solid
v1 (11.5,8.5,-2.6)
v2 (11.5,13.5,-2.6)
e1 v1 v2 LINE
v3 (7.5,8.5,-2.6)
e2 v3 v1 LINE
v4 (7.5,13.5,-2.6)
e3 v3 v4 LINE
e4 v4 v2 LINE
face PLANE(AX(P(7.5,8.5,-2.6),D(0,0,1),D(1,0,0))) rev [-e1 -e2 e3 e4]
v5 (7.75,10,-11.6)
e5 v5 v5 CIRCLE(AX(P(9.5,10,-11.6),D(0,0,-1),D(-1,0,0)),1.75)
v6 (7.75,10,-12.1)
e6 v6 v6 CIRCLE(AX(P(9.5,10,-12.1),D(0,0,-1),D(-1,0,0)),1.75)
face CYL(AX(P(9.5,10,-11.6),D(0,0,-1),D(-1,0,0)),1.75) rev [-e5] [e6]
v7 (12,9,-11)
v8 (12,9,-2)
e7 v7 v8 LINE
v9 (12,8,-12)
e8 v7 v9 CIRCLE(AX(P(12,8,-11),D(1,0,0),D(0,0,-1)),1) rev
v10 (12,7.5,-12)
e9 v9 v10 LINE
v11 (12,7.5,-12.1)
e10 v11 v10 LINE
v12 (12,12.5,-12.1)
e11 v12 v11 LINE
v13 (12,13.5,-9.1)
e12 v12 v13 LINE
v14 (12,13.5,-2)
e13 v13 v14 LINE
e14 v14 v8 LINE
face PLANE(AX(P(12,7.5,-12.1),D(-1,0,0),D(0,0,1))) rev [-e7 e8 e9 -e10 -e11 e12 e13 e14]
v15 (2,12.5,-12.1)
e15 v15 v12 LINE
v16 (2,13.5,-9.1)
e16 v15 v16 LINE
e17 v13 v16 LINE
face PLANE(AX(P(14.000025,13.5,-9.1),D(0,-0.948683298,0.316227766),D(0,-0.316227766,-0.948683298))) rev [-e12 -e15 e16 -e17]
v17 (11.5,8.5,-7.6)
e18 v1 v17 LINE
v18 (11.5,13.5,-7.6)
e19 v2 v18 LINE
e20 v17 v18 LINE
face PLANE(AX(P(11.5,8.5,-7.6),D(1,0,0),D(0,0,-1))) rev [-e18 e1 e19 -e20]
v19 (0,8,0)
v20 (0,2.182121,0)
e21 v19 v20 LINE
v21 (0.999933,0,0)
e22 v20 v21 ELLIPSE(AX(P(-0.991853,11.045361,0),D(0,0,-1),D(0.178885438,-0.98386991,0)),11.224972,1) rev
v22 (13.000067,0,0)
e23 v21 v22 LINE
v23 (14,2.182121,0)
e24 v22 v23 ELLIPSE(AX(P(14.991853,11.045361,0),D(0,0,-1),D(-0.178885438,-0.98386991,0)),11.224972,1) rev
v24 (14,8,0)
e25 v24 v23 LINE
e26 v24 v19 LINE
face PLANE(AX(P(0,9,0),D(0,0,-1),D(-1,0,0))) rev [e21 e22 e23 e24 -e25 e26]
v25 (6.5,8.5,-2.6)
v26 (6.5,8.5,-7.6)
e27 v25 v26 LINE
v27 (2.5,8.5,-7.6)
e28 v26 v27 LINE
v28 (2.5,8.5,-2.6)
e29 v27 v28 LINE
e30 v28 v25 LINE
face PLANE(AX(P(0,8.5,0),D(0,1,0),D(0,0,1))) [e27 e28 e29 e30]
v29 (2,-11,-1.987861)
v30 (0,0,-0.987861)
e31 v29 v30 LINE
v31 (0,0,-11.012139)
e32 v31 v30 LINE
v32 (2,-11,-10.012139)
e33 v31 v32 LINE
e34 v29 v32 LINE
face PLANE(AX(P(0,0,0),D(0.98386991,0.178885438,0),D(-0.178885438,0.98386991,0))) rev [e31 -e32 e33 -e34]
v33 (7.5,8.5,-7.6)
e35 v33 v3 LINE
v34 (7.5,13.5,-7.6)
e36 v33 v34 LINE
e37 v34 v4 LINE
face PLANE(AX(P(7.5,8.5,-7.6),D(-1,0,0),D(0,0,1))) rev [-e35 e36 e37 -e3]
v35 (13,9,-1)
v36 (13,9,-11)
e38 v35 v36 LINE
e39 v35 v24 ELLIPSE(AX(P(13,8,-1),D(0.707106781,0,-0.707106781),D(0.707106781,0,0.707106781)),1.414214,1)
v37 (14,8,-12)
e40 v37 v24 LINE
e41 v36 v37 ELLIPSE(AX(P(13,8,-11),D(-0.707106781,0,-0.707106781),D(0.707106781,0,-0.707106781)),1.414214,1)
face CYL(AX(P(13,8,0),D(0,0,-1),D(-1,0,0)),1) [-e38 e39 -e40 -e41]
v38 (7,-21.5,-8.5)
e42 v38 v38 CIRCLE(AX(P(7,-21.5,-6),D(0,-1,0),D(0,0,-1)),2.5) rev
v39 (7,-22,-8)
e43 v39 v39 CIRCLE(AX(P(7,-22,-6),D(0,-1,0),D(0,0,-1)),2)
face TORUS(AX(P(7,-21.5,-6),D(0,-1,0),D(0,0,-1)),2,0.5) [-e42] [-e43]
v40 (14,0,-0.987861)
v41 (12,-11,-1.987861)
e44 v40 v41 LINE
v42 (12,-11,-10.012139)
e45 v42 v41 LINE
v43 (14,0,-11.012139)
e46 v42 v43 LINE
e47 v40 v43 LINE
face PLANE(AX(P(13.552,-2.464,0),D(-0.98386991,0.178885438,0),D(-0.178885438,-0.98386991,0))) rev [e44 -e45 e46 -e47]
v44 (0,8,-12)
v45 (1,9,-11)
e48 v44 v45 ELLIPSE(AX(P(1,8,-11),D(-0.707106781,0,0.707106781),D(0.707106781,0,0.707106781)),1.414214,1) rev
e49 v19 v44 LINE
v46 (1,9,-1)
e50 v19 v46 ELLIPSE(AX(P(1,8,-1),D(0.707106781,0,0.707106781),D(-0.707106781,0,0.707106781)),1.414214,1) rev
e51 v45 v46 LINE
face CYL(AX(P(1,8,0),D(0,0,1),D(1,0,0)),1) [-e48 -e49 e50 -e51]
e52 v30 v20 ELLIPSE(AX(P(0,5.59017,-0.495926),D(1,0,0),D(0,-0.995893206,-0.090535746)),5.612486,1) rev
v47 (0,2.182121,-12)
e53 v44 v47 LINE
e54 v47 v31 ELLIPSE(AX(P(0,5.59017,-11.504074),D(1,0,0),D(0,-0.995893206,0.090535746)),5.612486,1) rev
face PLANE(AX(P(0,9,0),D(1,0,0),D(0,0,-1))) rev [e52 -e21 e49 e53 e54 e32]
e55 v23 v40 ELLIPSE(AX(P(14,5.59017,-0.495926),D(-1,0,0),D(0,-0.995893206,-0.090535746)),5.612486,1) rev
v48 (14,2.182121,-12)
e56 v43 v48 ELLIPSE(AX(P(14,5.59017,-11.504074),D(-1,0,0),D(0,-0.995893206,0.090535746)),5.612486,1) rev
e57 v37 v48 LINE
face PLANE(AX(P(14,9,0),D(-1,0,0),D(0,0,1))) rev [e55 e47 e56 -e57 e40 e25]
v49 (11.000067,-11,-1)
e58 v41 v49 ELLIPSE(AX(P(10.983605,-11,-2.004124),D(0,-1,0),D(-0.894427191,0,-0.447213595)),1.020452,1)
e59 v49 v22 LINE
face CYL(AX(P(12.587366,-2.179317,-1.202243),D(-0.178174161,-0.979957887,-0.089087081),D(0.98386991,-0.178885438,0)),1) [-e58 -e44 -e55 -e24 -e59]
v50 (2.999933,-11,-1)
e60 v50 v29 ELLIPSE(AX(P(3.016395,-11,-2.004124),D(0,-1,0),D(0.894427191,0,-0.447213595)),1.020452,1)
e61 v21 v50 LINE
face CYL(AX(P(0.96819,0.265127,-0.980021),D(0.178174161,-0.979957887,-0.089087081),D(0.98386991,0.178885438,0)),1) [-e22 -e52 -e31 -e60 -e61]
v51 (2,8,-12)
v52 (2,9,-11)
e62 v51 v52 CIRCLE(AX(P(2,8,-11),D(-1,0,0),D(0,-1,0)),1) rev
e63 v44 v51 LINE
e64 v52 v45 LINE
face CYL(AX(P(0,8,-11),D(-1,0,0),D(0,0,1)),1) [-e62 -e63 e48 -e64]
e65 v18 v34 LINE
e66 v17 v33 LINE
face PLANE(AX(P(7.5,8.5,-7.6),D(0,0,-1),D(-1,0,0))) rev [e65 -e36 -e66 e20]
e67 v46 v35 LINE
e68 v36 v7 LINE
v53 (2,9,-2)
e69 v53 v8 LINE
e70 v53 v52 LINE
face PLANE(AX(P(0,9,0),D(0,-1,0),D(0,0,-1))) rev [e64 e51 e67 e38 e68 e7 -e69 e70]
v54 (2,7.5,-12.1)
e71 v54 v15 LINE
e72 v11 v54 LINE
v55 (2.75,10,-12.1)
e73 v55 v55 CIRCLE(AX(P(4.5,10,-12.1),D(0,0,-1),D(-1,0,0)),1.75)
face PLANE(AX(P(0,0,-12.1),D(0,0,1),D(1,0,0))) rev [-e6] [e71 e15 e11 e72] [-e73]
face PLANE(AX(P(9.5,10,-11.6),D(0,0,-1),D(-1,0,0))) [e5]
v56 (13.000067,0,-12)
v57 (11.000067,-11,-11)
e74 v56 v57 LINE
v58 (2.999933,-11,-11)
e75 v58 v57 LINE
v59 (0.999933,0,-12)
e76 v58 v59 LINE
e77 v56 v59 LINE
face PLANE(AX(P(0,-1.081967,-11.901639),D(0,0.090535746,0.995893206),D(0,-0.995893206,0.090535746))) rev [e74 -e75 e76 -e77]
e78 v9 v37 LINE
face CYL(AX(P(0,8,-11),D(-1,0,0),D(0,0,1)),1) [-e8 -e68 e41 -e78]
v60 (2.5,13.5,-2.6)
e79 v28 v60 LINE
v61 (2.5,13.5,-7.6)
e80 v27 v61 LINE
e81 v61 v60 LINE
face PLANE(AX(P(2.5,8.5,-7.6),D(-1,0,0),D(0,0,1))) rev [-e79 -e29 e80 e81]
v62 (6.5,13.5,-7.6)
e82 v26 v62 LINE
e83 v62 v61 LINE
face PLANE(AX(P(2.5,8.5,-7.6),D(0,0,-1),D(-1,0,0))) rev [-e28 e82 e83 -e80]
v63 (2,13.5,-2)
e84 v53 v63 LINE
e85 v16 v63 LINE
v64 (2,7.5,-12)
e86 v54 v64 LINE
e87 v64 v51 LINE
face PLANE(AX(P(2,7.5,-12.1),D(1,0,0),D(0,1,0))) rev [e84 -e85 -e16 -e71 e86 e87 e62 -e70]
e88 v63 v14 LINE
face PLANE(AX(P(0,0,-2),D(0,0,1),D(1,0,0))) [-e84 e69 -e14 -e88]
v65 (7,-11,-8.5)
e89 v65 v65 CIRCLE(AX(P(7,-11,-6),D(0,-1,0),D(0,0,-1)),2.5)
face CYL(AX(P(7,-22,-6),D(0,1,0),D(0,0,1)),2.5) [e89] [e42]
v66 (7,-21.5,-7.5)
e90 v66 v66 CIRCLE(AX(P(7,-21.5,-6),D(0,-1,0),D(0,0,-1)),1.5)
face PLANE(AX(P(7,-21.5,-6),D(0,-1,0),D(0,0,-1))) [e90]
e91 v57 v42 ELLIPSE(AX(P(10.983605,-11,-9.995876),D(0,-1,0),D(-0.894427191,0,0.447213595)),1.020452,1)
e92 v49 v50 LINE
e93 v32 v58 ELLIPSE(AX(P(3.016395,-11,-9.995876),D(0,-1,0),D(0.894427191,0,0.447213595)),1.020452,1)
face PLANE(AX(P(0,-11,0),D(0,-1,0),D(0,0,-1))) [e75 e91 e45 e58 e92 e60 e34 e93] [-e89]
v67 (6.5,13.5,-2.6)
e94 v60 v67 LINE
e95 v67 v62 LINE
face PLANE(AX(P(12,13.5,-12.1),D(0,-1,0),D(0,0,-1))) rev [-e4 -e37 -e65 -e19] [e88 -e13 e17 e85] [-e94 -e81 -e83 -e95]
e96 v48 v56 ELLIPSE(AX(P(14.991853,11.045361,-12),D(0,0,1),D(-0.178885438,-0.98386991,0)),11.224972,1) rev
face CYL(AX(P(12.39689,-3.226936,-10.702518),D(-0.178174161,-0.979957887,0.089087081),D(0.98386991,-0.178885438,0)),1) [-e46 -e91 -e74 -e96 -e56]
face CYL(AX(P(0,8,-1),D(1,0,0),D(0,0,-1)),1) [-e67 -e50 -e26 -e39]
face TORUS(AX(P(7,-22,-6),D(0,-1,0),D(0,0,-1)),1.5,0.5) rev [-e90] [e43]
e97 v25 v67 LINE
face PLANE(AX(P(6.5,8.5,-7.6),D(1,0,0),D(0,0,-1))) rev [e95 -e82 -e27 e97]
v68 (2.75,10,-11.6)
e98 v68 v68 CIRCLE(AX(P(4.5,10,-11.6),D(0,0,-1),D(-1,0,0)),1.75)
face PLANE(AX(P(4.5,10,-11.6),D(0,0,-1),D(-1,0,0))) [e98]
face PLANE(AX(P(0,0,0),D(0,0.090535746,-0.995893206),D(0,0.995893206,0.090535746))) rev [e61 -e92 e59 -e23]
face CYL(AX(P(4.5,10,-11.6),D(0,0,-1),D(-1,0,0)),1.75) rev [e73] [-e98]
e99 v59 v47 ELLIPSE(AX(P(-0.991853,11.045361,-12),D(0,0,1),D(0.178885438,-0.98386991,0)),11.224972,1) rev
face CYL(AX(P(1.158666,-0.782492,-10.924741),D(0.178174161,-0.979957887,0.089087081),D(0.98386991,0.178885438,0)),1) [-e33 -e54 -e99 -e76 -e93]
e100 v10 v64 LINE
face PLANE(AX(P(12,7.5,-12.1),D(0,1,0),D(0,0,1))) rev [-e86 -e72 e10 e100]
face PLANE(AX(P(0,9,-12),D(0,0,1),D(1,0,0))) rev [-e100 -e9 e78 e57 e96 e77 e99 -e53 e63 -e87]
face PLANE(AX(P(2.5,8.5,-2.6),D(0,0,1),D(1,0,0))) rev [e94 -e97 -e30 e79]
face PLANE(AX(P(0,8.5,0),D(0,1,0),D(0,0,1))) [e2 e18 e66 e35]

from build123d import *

# Parameters (mm, degrees)
SKETCH_1_W          = 14
SKETCH_1_H          = 12
EXTRUDE_1_DEPTH     = 9
FILLET_2_R          = 1
FILLET_3_R          = 1
SKETCH_6_R          = 2.5
EXTRUDE_2_DEPTH     = 11
FILLET_4_R          = 0.5
SKETCH_7_R          = 2
CUT_EXTRUDE_1_DEPTH = 0.5
FILLET_5_R          = 0.5
SKETCH_8_W          = 10
SKETCH_8_H          = 5.607572988
CUT_EXTRUDE_2_DEPTH = 10
SKETCH_9_W          = 10
SKETCH_9_H          = 6
EXTRUDE_3_DEPTH     = 10.1
SKETCH_10_R         = 1.75
CUT_EXTRUDE_3_DEPTH = 0.5
CUT_EXTRUDE_4_DEPTH = 28.828223084
SKETCH_12_W         = 4
SKETCH_12_H         = 5
CUT_EXTRUDE_5_DEPTH = 5


# Some blends are built 0.0001 mm under size
with BuildPart() as part:
    # 草图1 → 凸台-拉伸1 (new body)
    with BuildSketch(Plane(origin=(0, 0, 0), x_dir=(1, 0, 0), z_dir=(0, 1, 0))):
        with Locations((7, 6)):
            Rectangle(SKETCH_1_W, SKETCH_1_H)
    extrude(amount=EXTRUDE_1_DEPTH)

    # 圆角2
    fillet_2_edges = [part.edges().sort_by_distance(p)[0] for p in [
        (14, 9, -6),
        (7, 9, -12),
        (0, 9, -6),
        (7, 9, 0),
    ]]
    fillet(fillet_2_edges, radius=FILLET_2_R)

    # 草图4 → 放样1 section 0
    with BuildSketch(Plane.XZ):
        with BuildLine():
            Line((0, 0), (14, 0))
            Line((14, 0), (14, -12))
            Line((14, -12), (0, -12))
            Line((0, -12), (0, 0))
        make_face()
    # 草图5 → 放样1 section 1
    with BuildSketch(Plane(origin=(0, -11, 0), x_dir=(-1, 0, 0), z_dir=(0, -1, 0))):
        with BuildLine():
            Line((-2, 1), (-12, 1))
            Line((-12, 1), (-12, 11))
            Line((-12, 11), (-2, 11))
            Line((-2, 11), (-2, 1))
        make_face()
    loft()

    # 圆角3
    # the kernel refuses this fillet: 1 mm, written as the material it takes off along each edge
    with BuildSketch(Plane(origin=(14.438278825, 2.410533539, -12.219139413), x_dir=(0.015936381457793344, 0.08765009801785527, 0.9960238411119947), z_dir=(-0.1781741612749496, -0.9799578870122228, 0.0890870806374748)), Plane(origin=(14.438278825, 2.410533539, 0.219139413), x_dir=(-0.9839989676081822, 0.17744243678180333, 0.016131130616527562), z_dir=(-0.1781741612749496, -0.9799578870122228, -0.08908708063747467))) as fillet_3_piece_1:
        with BuildLine():
            CenterArc((FILLET_3_R * 0.983933522321, FILLET_3_R), FILLET_3_R, 180.927975892, 89.072024108)
            Line((-FILLET_3_R * 0.0159353215369, FILLET_3_R * 0.983804473396), (0, 0))
            Line((0, 0), (FILLET_3_R * 0.983933522321, 0))
        make_face()
    extrude(amount=16.144639772, mode=Mode.SUBTRACT)
    with BuildSketch(Plane(origin=(-0.438278825, 2.410533539, -12.219139413), x_dir=(-0.015936381457791863, 0.08765009801785537, 0.9960238411119947), z_dir=(0.1781741612749496, -0.9799578870122228, 0.08908708063747463)), Plane(origin=(-0.438278825, 2.410533539, 0.219139413), x_dir=(0.9839989676081822, 0.17744243678180333, 0.016131130616527607), z_dir=(0.1781741612749496, -0.9799578870122228, -0.0890870806374748))) as fillet_3_piece_2:
        with BuildLine():
            CenterArc((FILLET_3_R * 0.983933522321, -FILLET_3_R), FILLET_3_R, 90, 89.072024108)
            Line((-FILLET_3_R * 0.0159353215369, -FILLET_3_R * 0.983804473396), (0, 0))
            Line((0, 0), (FILLET_3_R * 0.983933522321, 0))
        make_face()
    extrude(amount=16.144639772, mode=Mode.SUBTRACT)

    # 草图6 → 凸台-拉伸2 (add)
    with BuildSketch(Plane.XZ.offset(11)):
        with Locations(Location((7, -6, 0), (0, 0, 270))):
            Circle(SKETCH_6_R)
    extrude(amount=EXTRUDE_2_DEPTH)

    # 圆角4
    fillet_4_edges = [part.edges().sort_by_distance(p)[0] for p in [
        (7, -22, -3.5),
    ]]
    fillet(fillet_4_edges, radius=FILLET_4_R)

    # 草图7 → 切除-拉伸1 (cut)
    with BuildSketch(Plane.XZ.offset(22)):
        with Locations(Location((7, -6, 0), (0, 0, 270))):
            Circle(SKETCH_7_R)
    extrude(amount=-CUT_EXTRUDE_1_DEPTH, mode=Mode.SUBTRACT)

    # 圆角5
    fillet_5_edges = [part.edges().sort_by_distance(p)[0] for p in [
        (7, -21.5, -4),
    ]]
    fillet(fillet_5_edges, radius=FILLET_5_R - 0.0001)  # a hair under: the kernel refuses the full size

    # 草图8 → 切除-拉伸2 (cut)
    with BuildSketch(Plane(origin=(0, 0, -12), x_dir=(-1, 0, 0), z_dir=(0, 0, -1))):
        with Locations((-7, 10.303786494)):
            Rectangle(SKETCH_8_W, SKETCH_8_H)
    extrude(amount=-CUT_EXTRUDE_2_DEPTH, mode=Mode.SUBTRACT)

    # 草图9 → 凸台-拉伸3 (add)
    with BuildSketch(Plane(origin=(0, 0, -2), x_dir=(-1, 0, 0), z_dir=(0, 0, -1))):
        with Locations((-7, 10.5)):
            Rectangle(SKETCH_9_W, SKETCH_9_H)
    extrude(amount=EXTRUDE_3_DEPTH)

    # 草图10 → 切除-拉伸3 (cut)
    with BuildSketch(Plane(origin=(0, 0, -12.1), x_dir=(-1, 0, 0), z_dir=(0, 0, -1))):
        with Locations((-4.5, 10)):
            Circle(SKETCH_10_R)
        with Locations((-9.5, 10)):
            Circle(SKETCH_10_R)
    extrude(amount=-CUT_EXTRUDE_3_DEPTH, mode=Mode.SUBTRACT)

    # 草图11 → 切除-拉伸4 (cut, through all)
    with BuildSketch(Plane.ZY.offset(-2)):
        Polygon((-12.1, 12.5), (-12.1, 13.5), (-9.1, 13.5), align=None)
    extrude(amount=-CUT_EXTRUDE_4_DEPTH, mode=Mode.SUBTRACT)

    # 草图12 → 切除-拉伸5 (cut)
    with BuildSketch(Plane(origin=(0, 13.5, 0), x_dir=(1, 0, 0), z_dir=(0, 1, 0))):
        with Locations((4.5, 5.1)):
            Rectangle(SKETCH_12_W, SKETCH_12_H)
        with Locations((9.5, 5.1)):
            Rectangle(SKETCH_12_W, SKETCH_12_H)
    extrude(amount=-CUT_EXTRUDE_5_DEPTH, mode=Mode.SUBTRACT)


solid = part.part
